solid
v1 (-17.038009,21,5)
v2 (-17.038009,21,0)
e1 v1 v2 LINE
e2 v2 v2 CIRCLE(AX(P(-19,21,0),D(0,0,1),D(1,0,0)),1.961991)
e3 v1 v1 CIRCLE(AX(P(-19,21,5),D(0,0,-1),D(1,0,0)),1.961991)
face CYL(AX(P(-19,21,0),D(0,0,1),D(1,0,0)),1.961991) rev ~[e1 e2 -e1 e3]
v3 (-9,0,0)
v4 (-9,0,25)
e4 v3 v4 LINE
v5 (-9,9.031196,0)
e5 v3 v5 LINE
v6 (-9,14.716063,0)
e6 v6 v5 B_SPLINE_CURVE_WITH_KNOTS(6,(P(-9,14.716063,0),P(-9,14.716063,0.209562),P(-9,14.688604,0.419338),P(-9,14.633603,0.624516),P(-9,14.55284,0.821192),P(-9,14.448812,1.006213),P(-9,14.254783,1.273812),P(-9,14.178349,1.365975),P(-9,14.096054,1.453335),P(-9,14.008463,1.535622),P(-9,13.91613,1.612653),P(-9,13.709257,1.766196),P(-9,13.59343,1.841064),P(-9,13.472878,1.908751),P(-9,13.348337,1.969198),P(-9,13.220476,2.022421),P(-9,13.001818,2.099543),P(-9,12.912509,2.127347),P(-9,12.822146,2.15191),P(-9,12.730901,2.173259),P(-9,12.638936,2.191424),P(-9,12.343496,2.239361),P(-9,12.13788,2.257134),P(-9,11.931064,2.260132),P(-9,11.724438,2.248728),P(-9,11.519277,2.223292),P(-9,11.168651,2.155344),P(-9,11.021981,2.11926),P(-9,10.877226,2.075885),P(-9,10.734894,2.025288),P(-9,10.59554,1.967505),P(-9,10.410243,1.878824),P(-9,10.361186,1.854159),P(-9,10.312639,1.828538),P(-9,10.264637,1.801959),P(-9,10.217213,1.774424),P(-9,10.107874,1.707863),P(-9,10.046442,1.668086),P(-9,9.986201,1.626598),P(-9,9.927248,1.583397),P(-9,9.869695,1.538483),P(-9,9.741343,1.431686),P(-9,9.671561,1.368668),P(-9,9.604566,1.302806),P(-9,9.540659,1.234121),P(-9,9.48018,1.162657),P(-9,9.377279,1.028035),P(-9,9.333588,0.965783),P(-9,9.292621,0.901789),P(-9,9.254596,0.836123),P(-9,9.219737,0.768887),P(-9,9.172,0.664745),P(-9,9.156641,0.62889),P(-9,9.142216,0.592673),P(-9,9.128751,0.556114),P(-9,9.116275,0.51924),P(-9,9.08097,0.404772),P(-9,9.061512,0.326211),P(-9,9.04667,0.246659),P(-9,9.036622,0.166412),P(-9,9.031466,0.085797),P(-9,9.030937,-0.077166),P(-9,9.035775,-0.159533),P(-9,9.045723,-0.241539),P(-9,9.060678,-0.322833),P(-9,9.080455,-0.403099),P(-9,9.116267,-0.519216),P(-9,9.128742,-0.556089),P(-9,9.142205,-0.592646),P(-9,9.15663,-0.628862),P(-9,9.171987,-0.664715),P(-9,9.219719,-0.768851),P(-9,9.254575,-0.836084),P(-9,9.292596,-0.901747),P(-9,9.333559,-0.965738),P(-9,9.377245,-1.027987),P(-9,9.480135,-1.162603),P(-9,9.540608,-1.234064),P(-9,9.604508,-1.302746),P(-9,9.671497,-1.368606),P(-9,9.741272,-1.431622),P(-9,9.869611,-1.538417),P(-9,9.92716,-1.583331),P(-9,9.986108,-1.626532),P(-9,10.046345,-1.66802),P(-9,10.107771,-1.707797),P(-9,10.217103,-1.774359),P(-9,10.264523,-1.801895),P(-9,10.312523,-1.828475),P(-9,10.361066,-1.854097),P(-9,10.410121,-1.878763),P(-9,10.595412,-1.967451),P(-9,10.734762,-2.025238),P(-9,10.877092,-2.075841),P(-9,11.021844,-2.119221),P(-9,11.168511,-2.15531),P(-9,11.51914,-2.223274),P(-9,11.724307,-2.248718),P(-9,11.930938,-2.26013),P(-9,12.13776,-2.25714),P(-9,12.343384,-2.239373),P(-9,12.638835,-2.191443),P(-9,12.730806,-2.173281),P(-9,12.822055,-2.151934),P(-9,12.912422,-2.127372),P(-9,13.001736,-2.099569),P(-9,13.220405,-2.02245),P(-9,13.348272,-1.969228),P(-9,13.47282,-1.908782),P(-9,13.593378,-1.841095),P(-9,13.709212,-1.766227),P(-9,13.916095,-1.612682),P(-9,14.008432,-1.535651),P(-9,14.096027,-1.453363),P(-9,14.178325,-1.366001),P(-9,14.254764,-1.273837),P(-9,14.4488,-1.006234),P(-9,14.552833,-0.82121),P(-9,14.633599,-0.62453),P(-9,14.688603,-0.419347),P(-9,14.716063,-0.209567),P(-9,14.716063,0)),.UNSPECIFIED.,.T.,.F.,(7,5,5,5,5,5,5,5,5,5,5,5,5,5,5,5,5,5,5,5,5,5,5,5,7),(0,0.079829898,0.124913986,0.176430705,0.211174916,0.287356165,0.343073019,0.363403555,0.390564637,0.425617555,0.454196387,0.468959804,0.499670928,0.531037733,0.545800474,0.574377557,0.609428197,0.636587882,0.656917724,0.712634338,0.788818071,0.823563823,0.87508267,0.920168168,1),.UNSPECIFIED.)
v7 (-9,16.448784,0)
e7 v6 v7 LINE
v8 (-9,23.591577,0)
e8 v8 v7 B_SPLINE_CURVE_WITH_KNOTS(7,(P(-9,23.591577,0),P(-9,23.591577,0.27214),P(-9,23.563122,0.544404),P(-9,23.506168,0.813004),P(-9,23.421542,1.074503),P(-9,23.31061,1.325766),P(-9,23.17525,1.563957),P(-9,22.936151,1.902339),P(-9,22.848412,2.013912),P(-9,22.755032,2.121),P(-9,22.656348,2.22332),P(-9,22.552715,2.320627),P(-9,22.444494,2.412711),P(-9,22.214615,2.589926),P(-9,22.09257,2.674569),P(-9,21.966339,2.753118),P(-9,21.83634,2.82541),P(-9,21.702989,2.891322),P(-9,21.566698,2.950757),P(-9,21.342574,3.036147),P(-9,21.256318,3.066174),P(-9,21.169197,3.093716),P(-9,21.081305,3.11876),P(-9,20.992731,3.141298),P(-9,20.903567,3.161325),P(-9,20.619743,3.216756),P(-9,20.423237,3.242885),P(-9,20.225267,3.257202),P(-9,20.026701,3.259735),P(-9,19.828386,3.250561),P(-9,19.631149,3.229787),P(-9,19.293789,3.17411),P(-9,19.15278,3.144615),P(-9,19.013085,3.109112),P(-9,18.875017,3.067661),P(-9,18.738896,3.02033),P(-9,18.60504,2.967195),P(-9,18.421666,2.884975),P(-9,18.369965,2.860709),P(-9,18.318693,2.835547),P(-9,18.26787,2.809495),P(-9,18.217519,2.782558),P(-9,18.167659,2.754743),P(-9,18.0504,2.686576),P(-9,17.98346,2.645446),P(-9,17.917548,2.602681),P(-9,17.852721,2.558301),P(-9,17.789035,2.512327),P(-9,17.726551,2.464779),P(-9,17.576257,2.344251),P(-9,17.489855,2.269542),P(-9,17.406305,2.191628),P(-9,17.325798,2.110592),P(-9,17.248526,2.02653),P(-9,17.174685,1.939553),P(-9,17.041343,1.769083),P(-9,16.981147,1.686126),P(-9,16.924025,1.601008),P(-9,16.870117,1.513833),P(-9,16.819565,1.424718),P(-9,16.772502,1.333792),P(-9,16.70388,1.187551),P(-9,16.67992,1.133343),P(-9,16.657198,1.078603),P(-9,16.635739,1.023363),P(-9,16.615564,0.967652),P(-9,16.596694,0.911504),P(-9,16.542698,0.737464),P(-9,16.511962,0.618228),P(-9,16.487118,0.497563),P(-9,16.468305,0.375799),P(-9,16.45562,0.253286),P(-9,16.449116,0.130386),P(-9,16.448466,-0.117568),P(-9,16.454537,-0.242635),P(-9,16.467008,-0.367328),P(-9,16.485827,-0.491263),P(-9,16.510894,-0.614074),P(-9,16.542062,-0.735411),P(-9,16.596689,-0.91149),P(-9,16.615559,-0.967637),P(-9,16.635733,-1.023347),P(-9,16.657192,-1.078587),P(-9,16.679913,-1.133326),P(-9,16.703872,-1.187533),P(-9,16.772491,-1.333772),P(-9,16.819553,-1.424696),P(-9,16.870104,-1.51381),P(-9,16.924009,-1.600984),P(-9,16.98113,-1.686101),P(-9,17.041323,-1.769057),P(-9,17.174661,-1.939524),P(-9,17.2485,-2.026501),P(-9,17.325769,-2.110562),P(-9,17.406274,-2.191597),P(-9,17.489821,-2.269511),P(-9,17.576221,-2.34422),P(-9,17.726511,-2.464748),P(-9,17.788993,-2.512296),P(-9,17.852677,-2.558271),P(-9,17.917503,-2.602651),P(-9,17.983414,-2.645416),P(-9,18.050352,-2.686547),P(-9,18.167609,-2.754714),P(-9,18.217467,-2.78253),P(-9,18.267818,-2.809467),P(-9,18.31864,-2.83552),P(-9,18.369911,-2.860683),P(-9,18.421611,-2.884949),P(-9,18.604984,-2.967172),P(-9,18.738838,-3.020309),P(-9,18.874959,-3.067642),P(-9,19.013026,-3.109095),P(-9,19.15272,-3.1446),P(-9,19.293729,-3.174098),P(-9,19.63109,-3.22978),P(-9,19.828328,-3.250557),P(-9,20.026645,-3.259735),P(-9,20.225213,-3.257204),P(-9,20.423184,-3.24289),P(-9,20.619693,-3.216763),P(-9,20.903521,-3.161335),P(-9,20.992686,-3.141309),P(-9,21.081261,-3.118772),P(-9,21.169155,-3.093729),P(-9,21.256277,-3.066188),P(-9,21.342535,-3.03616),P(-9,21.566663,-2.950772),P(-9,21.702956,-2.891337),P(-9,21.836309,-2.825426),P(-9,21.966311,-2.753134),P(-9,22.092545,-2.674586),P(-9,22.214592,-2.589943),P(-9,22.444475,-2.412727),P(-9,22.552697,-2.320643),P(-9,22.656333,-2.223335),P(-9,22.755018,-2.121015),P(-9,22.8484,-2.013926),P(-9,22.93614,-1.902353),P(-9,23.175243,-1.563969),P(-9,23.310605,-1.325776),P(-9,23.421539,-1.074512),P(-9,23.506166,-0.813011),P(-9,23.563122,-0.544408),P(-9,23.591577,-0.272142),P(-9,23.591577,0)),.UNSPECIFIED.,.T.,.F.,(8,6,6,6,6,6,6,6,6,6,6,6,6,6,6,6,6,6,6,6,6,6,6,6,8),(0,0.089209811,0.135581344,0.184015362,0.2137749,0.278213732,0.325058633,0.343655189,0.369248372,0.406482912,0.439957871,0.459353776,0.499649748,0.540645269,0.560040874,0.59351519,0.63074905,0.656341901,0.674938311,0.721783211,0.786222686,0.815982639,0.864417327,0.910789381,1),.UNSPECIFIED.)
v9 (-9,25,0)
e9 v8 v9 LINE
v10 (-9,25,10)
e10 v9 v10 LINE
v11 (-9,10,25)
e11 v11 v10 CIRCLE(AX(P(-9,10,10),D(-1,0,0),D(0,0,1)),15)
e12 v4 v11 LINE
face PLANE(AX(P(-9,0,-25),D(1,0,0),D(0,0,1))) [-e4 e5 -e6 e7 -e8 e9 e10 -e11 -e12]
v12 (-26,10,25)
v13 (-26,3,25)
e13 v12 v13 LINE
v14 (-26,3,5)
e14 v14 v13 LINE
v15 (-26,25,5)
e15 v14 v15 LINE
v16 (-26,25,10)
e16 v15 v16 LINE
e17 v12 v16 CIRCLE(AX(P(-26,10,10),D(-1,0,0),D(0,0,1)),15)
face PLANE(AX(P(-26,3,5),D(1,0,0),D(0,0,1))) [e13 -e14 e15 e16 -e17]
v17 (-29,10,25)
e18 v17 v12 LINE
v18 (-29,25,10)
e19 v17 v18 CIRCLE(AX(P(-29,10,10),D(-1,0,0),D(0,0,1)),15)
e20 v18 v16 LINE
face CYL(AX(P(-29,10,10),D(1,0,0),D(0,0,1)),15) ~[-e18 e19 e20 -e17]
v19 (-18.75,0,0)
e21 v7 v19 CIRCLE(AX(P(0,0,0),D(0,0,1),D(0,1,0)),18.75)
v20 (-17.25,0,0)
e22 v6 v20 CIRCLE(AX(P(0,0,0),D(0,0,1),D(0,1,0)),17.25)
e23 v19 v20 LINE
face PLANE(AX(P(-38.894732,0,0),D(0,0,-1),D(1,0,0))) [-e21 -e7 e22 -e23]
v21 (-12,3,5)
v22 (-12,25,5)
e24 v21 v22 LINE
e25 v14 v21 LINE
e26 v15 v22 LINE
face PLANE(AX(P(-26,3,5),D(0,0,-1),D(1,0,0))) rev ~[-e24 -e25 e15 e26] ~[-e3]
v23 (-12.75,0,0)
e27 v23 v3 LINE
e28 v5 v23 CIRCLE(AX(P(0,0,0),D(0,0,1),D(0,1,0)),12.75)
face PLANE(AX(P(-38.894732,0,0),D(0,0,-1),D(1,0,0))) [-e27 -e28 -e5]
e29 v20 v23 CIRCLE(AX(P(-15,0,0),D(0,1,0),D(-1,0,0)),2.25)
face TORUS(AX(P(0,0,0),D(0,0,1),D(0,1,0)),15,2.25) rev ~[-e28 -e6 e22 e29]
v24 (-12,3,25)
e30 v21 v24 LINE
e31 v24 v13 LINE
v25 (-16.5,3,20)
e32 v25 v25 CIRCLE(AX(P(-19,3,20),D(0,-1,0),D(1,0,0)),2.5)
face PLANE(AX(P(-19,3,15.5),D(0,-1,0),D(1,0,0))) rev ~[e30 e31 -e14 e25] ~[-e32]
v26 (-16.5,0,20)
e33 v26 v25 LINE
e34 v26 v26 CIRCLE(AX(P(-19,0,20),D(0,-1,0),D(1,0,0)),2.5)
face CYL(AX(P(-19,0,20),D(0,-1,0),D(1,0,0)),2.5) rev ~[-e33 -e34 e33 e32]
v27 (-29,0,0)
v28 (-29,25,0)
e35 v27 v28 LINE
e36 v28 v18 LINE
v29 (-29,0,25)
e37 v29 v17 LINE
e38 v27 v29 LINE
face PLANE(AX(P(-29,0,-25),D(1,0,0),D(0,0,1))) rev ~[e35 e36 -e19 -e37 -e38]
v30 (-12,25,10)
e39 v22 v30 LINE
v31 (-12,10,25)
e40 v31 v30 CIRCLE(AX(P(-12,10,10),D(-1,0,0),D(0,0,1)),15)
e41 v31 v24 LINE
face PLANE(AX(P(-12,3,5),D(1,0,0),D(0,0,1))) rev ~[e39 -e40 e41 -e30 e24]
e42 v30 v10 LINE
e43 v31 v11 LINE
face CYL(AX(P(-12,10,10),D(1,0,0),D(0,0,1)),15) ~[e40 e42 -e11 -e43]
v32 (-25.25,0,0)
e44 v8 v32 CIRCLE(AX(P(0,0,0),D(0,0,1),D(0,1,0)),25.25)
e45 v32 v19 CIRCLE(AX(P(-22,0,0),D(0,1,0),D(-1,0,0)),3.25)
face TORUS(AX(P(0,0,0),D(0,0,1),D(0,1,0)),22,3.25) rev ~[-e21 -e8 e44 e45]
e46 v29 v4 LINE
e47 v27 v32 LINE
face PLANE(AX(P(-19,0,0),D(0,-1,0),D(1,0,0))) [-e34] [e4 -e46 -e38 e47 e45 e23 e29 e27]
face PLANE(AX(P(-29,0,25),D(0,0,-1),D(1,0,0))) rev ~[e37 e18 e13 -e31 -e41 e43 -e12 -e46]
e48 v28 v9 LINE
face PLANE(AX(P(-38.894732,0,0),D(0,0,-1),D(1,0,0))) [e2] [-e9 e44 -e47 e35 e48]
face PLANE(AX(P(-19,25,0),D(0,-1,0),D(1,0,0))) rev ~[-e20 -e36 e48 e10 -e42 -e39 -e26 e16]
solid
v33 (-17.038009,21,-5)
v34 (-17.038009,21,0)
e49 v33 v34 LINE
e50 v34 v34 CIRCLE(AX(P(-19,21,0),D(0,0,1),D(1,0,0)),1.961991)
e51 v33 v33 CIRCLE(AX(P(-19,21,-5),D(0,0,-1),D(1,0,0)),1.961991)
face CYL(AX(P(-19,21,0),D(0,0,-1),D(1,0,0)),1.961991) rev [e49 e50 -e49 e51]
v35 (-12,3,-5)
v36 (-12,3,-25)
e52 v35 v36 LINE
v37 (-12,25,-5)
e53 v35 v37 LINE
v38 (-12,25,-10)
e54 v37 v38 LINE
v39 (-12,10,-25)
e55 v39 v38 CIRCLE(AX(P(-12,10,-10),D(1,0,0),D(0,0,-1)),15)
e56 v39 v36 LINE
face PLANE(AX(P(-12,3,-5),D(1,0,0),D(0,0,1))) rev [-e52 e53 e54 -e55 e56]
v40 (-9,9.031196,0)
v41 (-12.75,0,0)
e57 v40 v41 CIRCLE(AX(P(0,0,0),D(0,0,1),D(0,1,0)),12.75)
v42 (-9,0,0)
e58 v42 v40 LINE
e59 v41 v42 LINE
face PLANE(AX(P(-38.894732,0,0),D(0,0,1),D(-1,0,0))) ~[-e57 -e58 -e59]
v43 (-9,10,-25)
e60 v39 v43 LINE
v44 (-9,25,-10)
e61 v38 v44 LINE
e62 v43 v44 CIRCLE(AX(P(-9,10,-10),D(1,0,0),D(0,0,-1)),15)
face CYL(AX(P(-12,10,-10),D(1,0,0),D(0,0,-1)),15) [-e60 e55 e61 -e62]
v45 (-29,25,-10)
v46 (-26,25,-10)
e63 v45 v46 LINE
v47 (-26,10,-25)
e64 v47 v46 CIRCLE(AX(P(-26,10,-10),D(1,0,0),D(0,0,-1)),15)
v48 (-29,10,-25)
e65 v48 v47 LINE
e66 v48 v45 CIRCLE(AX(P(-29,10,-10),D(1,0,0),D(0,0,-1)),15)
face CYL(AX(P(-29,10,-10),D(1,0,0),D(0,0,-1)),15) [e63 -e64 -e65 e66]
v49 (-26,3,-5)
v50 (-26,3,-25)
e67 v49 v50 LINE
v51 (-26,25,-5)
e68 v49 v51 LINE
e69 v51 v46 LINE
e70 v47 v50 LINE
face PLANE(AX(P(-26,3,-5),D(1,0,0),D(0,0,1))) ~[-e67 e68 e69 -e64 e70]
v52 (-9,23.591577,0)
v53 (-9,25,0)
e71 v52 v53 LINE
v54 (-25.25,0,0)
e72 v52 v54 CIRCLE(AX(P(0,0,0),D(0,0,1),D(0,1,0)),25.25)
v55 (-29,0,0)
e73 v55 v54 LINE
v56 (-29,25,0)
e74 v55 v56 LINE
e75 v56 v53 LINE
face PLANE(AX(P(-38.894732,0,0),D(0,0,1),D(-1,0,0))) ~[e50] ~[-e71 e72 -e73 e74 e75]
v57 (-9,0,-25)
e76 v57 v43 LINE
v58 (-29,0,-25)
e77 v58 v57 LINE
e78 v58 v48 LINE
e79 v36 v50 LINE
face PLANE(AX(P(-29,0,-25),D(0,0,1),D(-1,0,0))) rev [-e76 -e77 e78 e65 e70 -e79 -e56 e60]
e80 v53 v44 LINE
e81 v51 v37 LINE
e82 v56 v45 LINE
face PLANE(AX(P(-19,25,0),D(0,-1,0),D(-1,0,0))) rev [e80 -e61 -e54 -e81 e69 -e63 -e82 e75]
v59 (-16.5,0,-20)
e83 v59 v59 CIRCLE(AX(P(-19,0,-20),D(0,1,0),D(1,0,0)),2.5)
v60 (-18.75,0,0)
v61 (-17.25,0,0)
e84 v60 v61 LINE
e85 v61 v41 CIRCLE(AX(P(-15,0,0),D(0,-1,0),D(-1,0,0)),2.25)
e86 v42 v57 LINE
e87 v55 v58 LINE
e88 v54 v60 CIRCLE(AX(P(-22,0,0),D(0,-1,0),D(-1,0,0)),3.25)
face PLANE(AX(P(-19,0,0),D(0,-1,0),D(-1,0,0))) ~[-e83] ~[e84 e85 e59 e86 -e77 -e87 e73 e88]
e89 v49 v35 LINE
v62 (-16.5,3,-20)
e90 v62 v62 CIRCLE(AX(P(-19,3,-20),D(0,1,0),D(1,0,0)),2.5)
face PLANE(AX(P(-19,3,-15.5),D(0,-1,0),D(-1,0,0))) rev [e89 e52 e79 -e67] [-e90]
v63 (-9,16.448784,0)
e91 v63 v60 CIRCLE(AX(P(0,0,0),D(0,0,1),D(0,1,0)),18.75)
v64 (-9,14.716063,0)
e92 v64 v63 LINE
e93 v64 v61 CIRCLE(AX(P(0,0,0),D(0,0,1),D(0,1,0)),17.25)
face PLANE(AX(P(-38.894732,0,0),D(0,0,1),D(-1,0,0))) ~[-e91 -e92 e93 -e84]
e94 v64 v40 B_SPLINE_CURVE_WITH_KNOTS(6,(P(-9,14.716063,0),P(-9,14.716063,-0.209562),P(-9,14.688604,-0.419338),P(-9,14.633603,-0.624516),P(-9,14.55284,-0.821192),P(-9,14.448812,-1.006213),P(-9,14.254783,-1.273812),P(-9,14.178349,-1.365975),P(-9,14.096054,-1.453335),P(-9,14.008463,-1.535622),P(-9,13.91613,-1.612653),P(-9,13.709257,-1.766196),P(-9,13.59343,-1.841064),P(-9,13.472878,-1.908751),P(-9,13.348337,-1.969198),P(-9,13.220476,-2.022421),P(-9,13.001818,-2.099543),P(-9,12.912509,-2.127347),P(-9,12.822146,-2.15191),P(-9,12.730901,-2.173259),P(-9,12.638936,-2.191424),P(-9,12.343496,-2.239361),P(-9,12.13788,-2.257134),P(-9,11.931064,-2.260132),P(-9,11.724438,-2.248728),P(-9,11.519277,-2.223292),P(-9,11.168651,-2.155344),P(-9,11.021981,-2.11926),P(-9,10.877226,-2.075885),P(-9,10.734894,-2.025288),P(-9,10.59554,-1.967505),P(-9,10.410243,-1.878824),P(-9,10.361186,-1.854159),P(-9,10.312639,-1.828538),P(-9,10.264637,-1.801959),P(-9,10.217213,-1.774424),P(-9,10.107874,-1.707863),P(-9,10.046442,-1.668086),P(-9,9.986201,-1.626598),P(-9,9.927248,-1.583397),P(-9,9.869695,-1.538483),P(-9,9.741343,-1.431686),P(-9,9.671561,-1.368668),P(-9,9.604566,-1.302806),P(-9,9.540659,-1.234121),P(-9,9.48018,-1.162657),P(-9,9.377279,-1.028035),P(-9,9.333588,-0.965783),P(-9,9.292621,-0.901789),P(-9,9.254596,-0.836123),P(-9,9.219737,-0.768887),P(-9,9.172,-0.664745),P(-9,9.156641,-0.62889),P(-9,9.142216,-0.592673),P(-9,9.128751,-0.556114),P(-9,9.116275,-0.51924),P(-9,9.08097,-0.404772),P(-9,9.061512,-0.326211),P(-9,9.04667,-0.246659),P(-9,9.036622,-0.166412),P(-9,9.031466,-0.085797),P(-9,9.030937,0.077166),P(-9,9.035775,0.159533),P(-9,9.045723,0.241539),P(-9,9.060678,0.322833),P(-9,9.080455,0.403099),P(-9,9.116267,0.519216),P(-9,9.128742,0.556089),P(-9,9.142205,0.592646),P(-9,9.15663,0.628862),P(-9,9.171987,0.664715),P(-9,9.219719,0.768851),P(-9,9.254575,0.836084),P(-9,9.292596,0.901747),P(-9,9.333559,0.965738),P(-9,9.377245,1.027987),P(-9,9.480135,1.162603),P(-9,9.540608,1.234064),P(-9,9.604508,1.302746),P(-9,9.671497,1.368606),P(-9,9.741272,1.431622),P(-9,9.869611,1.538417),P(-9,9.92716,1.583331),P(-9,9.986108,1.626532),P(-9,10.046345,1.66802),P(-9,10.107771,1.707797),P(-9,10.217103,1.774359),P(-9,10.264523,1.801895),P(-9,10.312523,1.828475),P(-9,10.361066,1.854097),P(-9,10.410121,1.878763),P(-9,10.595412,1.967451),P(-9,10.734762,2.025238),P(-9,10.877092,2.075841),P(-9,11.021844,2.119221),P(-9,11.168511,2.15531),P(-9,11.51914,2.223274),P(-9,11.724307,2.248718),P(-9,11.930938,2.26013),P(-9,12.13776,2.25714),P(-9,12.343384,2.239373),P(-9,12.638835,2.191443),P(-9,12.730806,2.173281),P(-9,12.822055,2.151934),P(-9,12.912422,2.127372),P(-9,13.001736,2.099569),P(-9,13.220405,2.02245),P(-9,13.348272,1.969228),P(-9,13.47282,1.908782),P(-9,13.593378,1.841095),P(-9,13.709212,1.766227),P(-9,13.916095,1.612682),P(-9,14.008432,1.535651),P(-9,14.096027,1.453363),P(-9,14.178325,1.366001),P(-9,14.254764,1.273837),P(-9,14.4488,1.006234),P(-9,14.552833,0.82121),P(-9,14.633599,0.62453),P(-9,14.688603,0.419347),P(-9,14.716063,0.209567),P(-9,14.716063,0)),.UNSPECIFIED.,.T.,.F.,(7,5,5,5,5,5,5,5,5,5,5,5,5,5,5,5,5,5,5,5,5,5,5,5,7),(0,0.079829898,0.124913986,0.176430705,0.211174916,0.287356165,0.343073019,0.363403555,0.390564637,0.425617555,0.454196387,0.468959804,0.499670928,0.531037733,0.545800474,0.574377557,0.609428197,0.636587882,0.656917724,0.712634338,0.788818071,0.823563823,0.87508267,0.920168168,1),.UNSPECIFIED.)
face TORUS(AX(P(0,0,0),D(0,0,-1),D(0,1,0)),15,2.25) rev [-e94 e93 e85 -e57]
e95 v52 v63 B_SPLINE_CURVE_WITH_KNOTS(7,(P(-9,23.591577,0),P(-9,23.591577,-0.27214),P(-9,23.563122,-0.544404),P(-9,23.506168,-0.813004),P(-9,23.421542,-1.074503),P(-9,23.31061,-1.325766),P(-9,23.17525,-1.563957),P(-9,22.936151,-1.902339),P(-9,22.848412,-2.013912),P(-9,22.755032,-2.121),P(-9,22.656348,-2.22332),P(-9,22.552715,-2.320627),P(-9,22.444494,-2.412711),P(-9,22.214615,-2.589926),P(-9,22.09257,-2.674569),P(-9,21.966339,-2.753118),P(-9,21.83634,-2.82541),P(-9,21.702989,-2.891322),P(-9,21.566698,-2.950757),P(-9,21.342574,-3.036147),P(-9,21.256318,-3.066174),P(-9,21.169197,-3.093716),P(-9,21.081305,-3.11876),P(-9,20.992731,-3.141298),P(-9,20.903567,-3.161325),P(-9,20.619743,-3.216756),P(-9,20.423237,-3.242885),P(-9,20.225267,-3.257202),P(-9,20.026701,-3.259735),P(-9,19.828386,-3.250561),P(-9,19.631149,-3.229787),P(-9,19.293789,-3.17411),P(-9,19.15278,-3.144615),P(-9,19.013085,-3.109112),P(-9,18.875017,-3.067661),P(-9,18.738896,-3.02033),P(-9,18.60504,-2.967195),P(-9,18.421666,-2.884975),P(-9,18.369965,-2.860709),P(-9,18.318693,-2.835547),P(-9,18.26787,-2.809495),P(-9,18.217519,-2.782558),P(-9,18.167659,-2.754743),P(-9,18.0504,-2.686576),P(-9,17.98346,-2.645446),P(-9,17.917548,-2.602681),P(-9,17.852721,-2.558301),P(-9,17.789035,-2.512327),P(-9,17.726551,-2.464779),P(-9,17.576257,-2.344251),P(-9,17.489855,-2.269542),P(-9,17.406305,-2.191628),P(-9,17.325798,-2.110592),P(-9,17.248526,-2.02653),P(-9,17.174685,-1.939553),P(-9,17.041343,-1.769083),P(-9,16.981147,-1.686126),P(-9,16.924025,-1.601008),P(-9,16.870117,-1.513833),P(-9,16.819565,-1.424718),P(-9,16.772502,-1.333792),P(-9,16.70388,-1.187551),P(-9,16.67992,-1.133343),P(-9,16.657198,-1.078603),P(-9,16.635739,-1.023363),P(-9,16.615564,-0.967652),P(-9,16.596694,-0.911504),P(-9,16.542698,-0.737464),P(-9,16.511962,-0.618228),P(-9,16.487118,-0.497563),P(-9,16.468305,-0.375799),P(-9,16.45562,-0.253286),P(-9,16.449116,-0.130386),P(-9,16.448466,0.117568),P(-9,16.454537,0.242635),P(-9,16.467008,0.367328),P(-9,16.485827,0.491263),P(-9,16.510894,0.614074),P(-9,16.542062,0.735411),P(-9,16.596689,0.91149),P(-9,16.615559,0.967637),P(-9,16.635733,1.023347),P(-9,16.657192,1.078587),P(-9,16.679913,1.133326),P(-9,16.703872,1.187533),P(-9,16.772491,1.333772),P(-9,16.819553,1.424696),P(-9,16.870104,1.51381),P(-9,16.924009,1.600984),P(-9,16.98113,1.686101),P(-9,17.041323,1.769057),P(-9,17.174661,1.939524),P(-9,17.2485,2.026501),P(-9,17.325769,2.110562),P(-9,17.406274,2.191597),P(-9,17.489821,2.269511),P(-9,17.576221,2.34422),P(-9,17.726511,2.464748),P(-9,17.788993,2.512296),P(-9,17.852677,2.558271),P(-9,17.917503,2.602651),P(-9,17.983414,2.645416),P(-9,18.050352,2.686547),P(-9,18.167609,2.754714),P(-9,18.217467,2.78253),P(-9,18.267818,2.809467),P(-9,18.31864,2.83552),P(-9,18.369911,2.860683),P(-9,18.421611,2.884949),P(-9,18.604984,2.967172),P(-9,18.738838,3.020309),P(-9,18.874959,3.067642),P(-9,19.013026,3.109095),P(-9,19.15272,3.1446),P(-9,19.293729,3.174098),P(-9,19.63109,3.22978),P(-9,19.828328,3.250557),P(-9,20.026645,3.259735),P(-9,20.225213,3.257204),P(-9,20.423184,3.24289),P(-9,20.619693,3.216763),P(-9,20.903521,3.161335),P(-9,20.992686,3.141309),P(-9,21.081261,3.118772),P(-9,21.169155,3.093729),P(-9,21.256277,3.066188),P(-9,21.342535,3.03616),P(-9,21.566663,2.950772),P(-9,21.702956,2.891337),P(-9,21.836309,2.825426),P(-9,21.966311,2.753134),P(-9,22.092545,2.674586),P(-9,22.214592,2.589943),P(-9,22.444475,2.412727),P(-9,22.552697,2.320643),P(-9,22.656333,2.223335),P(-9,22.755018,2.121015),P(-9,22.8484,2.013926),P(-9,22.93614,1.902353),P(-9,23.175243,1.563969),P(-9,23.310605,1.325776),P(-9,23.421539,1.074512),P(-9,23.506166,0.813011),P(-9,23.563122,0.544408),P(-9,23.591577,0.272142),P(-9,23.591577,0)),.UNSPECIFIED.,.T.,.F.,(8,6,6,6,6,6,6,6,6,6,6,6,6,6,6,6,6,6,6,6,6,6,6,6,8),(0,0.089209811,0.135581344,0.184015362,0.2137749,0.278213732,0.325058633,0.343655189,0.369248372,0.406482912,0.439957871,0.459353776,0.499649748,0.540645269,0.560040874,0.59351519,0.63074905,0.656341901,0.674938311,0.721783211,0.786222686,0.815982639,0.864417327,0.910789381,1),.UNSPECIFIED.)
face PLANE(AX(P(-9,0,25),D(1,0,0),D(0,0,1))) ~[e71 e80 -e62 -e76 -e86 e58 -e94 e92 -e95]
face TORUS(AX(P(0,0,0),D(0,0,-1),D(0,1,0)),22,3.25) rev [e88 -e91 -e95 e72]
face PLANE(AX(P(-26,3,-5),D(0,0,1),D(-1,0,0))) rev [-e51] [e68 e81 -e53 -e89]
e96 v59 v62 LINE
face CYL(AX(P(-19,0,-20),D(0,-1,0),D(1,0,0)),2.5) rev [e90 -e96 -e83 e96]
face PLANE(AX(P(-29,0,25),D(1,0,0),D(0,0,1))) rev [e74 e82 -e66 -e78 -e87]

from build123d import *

# Parameters (mm, degrees)
F2_W           = 20
F2_H           = 50
F3_DEPTH       = 25
F5_START       = -3
F4_W           = 14
F4_H           = 21
F5_DEPTH       = 22.001
F1_R           = 3.25
F6_ANGLE       = 90
F1_R_2         = 2.25
F7_ANGLE       = 90
F8_R           = 2.5
F9_DEPTH       = 25
F10_R          = 1.9619906376
F11_DEPTH      = 25
F11_DEPTH_BACK = 25
F12_W          = 35.8874800149
F12_H          = 25.5419854075
F13_DEPTH      = 25
F14_R          = 15


with BuildPart() as f3:
    # F2 (on Front) → F3 (new body)
    with BuildSketch(Plane.XZ):
        with Locations((-19, 0)):
            Rectangle(F2_W, F2_H)
    extrude(amount=-F3_DEPTH)

    # F4 (on Front) → F5 (cut)
    with BuildSketch(Plane.XZ.offset(F5_START)):
        with Locations((-19, 15.5)):
            Rectangle(F4_W, F4_H)
    extrude(amount=-F5_DEPTH, mode=Mode.SUBTRACT)

    # F1 (on Right) → F6 (revolve, cut)
    with BuildSketch(Plane.YZ):
        with Locations((22, 0)):
            Circle(F1_R)
    revolve(axis=Axis((0, 0, 0), (0, 0, 1)), revolution_arc=F6_ANGLE, mode=Mode.SUBTRACT)

    # F1 (on Right) → F7 (revolve, cut)
    with BuildSketch(Plane.YZ):
        with Locations((15, 0)):
            Circle(F1_R_2)
    revolve(axis=Axis((0, 0, 0), (0, 0, 1)), revolution_arc=F7_ANGLE, mode=Mode.SUBTRACT)

    # F8 (on Front) → F9 (cut)
    with BuildSketch(Plane.XZ):
        with Locations((-19, 20)):
            Circle(F8_R)
    extrude(amount=-F9_DEPTH, mode=Mode.SUBTRACT)

    # F10 (on Top) → F11 (cut, two sides)
    with BuildSketch(Plane.XY) as f11_sk:
        with Locations((-19, 21)):
            Circle(F10_R)
    extrude(amount=-F11_DEPTH, mode=Mode.SUBTRACT)
    extrude(f11_sk.sketch, amount=F11_DEPTH_BACK, mode=Mode.SUBTRACT)

    # F12 (on Front) → F13 (cut)
    with BuildSketch(Plane.XZ):
        with Locations((-20.9509915439, -12.7709927037)):
            Rectangle(F12_W, F12_H)
    extrude(amount=-F13_DEPTH, mode=Mode.SUBTRACT)

    # F14
    f14_edges = [f3.edges().sort_by_distance(p)[0] for p in [
        (-10.5, 25, 25),
        (-27.5, 25, 25),
    ]]
    fillet(f14_edges, radius=F14_R)


with BuildPart() as f15_1:
    # F15: instance of F3
    add(f3.part.mirror(Plane.XY))


solid = Compound([f3.part, f15_1.part])
